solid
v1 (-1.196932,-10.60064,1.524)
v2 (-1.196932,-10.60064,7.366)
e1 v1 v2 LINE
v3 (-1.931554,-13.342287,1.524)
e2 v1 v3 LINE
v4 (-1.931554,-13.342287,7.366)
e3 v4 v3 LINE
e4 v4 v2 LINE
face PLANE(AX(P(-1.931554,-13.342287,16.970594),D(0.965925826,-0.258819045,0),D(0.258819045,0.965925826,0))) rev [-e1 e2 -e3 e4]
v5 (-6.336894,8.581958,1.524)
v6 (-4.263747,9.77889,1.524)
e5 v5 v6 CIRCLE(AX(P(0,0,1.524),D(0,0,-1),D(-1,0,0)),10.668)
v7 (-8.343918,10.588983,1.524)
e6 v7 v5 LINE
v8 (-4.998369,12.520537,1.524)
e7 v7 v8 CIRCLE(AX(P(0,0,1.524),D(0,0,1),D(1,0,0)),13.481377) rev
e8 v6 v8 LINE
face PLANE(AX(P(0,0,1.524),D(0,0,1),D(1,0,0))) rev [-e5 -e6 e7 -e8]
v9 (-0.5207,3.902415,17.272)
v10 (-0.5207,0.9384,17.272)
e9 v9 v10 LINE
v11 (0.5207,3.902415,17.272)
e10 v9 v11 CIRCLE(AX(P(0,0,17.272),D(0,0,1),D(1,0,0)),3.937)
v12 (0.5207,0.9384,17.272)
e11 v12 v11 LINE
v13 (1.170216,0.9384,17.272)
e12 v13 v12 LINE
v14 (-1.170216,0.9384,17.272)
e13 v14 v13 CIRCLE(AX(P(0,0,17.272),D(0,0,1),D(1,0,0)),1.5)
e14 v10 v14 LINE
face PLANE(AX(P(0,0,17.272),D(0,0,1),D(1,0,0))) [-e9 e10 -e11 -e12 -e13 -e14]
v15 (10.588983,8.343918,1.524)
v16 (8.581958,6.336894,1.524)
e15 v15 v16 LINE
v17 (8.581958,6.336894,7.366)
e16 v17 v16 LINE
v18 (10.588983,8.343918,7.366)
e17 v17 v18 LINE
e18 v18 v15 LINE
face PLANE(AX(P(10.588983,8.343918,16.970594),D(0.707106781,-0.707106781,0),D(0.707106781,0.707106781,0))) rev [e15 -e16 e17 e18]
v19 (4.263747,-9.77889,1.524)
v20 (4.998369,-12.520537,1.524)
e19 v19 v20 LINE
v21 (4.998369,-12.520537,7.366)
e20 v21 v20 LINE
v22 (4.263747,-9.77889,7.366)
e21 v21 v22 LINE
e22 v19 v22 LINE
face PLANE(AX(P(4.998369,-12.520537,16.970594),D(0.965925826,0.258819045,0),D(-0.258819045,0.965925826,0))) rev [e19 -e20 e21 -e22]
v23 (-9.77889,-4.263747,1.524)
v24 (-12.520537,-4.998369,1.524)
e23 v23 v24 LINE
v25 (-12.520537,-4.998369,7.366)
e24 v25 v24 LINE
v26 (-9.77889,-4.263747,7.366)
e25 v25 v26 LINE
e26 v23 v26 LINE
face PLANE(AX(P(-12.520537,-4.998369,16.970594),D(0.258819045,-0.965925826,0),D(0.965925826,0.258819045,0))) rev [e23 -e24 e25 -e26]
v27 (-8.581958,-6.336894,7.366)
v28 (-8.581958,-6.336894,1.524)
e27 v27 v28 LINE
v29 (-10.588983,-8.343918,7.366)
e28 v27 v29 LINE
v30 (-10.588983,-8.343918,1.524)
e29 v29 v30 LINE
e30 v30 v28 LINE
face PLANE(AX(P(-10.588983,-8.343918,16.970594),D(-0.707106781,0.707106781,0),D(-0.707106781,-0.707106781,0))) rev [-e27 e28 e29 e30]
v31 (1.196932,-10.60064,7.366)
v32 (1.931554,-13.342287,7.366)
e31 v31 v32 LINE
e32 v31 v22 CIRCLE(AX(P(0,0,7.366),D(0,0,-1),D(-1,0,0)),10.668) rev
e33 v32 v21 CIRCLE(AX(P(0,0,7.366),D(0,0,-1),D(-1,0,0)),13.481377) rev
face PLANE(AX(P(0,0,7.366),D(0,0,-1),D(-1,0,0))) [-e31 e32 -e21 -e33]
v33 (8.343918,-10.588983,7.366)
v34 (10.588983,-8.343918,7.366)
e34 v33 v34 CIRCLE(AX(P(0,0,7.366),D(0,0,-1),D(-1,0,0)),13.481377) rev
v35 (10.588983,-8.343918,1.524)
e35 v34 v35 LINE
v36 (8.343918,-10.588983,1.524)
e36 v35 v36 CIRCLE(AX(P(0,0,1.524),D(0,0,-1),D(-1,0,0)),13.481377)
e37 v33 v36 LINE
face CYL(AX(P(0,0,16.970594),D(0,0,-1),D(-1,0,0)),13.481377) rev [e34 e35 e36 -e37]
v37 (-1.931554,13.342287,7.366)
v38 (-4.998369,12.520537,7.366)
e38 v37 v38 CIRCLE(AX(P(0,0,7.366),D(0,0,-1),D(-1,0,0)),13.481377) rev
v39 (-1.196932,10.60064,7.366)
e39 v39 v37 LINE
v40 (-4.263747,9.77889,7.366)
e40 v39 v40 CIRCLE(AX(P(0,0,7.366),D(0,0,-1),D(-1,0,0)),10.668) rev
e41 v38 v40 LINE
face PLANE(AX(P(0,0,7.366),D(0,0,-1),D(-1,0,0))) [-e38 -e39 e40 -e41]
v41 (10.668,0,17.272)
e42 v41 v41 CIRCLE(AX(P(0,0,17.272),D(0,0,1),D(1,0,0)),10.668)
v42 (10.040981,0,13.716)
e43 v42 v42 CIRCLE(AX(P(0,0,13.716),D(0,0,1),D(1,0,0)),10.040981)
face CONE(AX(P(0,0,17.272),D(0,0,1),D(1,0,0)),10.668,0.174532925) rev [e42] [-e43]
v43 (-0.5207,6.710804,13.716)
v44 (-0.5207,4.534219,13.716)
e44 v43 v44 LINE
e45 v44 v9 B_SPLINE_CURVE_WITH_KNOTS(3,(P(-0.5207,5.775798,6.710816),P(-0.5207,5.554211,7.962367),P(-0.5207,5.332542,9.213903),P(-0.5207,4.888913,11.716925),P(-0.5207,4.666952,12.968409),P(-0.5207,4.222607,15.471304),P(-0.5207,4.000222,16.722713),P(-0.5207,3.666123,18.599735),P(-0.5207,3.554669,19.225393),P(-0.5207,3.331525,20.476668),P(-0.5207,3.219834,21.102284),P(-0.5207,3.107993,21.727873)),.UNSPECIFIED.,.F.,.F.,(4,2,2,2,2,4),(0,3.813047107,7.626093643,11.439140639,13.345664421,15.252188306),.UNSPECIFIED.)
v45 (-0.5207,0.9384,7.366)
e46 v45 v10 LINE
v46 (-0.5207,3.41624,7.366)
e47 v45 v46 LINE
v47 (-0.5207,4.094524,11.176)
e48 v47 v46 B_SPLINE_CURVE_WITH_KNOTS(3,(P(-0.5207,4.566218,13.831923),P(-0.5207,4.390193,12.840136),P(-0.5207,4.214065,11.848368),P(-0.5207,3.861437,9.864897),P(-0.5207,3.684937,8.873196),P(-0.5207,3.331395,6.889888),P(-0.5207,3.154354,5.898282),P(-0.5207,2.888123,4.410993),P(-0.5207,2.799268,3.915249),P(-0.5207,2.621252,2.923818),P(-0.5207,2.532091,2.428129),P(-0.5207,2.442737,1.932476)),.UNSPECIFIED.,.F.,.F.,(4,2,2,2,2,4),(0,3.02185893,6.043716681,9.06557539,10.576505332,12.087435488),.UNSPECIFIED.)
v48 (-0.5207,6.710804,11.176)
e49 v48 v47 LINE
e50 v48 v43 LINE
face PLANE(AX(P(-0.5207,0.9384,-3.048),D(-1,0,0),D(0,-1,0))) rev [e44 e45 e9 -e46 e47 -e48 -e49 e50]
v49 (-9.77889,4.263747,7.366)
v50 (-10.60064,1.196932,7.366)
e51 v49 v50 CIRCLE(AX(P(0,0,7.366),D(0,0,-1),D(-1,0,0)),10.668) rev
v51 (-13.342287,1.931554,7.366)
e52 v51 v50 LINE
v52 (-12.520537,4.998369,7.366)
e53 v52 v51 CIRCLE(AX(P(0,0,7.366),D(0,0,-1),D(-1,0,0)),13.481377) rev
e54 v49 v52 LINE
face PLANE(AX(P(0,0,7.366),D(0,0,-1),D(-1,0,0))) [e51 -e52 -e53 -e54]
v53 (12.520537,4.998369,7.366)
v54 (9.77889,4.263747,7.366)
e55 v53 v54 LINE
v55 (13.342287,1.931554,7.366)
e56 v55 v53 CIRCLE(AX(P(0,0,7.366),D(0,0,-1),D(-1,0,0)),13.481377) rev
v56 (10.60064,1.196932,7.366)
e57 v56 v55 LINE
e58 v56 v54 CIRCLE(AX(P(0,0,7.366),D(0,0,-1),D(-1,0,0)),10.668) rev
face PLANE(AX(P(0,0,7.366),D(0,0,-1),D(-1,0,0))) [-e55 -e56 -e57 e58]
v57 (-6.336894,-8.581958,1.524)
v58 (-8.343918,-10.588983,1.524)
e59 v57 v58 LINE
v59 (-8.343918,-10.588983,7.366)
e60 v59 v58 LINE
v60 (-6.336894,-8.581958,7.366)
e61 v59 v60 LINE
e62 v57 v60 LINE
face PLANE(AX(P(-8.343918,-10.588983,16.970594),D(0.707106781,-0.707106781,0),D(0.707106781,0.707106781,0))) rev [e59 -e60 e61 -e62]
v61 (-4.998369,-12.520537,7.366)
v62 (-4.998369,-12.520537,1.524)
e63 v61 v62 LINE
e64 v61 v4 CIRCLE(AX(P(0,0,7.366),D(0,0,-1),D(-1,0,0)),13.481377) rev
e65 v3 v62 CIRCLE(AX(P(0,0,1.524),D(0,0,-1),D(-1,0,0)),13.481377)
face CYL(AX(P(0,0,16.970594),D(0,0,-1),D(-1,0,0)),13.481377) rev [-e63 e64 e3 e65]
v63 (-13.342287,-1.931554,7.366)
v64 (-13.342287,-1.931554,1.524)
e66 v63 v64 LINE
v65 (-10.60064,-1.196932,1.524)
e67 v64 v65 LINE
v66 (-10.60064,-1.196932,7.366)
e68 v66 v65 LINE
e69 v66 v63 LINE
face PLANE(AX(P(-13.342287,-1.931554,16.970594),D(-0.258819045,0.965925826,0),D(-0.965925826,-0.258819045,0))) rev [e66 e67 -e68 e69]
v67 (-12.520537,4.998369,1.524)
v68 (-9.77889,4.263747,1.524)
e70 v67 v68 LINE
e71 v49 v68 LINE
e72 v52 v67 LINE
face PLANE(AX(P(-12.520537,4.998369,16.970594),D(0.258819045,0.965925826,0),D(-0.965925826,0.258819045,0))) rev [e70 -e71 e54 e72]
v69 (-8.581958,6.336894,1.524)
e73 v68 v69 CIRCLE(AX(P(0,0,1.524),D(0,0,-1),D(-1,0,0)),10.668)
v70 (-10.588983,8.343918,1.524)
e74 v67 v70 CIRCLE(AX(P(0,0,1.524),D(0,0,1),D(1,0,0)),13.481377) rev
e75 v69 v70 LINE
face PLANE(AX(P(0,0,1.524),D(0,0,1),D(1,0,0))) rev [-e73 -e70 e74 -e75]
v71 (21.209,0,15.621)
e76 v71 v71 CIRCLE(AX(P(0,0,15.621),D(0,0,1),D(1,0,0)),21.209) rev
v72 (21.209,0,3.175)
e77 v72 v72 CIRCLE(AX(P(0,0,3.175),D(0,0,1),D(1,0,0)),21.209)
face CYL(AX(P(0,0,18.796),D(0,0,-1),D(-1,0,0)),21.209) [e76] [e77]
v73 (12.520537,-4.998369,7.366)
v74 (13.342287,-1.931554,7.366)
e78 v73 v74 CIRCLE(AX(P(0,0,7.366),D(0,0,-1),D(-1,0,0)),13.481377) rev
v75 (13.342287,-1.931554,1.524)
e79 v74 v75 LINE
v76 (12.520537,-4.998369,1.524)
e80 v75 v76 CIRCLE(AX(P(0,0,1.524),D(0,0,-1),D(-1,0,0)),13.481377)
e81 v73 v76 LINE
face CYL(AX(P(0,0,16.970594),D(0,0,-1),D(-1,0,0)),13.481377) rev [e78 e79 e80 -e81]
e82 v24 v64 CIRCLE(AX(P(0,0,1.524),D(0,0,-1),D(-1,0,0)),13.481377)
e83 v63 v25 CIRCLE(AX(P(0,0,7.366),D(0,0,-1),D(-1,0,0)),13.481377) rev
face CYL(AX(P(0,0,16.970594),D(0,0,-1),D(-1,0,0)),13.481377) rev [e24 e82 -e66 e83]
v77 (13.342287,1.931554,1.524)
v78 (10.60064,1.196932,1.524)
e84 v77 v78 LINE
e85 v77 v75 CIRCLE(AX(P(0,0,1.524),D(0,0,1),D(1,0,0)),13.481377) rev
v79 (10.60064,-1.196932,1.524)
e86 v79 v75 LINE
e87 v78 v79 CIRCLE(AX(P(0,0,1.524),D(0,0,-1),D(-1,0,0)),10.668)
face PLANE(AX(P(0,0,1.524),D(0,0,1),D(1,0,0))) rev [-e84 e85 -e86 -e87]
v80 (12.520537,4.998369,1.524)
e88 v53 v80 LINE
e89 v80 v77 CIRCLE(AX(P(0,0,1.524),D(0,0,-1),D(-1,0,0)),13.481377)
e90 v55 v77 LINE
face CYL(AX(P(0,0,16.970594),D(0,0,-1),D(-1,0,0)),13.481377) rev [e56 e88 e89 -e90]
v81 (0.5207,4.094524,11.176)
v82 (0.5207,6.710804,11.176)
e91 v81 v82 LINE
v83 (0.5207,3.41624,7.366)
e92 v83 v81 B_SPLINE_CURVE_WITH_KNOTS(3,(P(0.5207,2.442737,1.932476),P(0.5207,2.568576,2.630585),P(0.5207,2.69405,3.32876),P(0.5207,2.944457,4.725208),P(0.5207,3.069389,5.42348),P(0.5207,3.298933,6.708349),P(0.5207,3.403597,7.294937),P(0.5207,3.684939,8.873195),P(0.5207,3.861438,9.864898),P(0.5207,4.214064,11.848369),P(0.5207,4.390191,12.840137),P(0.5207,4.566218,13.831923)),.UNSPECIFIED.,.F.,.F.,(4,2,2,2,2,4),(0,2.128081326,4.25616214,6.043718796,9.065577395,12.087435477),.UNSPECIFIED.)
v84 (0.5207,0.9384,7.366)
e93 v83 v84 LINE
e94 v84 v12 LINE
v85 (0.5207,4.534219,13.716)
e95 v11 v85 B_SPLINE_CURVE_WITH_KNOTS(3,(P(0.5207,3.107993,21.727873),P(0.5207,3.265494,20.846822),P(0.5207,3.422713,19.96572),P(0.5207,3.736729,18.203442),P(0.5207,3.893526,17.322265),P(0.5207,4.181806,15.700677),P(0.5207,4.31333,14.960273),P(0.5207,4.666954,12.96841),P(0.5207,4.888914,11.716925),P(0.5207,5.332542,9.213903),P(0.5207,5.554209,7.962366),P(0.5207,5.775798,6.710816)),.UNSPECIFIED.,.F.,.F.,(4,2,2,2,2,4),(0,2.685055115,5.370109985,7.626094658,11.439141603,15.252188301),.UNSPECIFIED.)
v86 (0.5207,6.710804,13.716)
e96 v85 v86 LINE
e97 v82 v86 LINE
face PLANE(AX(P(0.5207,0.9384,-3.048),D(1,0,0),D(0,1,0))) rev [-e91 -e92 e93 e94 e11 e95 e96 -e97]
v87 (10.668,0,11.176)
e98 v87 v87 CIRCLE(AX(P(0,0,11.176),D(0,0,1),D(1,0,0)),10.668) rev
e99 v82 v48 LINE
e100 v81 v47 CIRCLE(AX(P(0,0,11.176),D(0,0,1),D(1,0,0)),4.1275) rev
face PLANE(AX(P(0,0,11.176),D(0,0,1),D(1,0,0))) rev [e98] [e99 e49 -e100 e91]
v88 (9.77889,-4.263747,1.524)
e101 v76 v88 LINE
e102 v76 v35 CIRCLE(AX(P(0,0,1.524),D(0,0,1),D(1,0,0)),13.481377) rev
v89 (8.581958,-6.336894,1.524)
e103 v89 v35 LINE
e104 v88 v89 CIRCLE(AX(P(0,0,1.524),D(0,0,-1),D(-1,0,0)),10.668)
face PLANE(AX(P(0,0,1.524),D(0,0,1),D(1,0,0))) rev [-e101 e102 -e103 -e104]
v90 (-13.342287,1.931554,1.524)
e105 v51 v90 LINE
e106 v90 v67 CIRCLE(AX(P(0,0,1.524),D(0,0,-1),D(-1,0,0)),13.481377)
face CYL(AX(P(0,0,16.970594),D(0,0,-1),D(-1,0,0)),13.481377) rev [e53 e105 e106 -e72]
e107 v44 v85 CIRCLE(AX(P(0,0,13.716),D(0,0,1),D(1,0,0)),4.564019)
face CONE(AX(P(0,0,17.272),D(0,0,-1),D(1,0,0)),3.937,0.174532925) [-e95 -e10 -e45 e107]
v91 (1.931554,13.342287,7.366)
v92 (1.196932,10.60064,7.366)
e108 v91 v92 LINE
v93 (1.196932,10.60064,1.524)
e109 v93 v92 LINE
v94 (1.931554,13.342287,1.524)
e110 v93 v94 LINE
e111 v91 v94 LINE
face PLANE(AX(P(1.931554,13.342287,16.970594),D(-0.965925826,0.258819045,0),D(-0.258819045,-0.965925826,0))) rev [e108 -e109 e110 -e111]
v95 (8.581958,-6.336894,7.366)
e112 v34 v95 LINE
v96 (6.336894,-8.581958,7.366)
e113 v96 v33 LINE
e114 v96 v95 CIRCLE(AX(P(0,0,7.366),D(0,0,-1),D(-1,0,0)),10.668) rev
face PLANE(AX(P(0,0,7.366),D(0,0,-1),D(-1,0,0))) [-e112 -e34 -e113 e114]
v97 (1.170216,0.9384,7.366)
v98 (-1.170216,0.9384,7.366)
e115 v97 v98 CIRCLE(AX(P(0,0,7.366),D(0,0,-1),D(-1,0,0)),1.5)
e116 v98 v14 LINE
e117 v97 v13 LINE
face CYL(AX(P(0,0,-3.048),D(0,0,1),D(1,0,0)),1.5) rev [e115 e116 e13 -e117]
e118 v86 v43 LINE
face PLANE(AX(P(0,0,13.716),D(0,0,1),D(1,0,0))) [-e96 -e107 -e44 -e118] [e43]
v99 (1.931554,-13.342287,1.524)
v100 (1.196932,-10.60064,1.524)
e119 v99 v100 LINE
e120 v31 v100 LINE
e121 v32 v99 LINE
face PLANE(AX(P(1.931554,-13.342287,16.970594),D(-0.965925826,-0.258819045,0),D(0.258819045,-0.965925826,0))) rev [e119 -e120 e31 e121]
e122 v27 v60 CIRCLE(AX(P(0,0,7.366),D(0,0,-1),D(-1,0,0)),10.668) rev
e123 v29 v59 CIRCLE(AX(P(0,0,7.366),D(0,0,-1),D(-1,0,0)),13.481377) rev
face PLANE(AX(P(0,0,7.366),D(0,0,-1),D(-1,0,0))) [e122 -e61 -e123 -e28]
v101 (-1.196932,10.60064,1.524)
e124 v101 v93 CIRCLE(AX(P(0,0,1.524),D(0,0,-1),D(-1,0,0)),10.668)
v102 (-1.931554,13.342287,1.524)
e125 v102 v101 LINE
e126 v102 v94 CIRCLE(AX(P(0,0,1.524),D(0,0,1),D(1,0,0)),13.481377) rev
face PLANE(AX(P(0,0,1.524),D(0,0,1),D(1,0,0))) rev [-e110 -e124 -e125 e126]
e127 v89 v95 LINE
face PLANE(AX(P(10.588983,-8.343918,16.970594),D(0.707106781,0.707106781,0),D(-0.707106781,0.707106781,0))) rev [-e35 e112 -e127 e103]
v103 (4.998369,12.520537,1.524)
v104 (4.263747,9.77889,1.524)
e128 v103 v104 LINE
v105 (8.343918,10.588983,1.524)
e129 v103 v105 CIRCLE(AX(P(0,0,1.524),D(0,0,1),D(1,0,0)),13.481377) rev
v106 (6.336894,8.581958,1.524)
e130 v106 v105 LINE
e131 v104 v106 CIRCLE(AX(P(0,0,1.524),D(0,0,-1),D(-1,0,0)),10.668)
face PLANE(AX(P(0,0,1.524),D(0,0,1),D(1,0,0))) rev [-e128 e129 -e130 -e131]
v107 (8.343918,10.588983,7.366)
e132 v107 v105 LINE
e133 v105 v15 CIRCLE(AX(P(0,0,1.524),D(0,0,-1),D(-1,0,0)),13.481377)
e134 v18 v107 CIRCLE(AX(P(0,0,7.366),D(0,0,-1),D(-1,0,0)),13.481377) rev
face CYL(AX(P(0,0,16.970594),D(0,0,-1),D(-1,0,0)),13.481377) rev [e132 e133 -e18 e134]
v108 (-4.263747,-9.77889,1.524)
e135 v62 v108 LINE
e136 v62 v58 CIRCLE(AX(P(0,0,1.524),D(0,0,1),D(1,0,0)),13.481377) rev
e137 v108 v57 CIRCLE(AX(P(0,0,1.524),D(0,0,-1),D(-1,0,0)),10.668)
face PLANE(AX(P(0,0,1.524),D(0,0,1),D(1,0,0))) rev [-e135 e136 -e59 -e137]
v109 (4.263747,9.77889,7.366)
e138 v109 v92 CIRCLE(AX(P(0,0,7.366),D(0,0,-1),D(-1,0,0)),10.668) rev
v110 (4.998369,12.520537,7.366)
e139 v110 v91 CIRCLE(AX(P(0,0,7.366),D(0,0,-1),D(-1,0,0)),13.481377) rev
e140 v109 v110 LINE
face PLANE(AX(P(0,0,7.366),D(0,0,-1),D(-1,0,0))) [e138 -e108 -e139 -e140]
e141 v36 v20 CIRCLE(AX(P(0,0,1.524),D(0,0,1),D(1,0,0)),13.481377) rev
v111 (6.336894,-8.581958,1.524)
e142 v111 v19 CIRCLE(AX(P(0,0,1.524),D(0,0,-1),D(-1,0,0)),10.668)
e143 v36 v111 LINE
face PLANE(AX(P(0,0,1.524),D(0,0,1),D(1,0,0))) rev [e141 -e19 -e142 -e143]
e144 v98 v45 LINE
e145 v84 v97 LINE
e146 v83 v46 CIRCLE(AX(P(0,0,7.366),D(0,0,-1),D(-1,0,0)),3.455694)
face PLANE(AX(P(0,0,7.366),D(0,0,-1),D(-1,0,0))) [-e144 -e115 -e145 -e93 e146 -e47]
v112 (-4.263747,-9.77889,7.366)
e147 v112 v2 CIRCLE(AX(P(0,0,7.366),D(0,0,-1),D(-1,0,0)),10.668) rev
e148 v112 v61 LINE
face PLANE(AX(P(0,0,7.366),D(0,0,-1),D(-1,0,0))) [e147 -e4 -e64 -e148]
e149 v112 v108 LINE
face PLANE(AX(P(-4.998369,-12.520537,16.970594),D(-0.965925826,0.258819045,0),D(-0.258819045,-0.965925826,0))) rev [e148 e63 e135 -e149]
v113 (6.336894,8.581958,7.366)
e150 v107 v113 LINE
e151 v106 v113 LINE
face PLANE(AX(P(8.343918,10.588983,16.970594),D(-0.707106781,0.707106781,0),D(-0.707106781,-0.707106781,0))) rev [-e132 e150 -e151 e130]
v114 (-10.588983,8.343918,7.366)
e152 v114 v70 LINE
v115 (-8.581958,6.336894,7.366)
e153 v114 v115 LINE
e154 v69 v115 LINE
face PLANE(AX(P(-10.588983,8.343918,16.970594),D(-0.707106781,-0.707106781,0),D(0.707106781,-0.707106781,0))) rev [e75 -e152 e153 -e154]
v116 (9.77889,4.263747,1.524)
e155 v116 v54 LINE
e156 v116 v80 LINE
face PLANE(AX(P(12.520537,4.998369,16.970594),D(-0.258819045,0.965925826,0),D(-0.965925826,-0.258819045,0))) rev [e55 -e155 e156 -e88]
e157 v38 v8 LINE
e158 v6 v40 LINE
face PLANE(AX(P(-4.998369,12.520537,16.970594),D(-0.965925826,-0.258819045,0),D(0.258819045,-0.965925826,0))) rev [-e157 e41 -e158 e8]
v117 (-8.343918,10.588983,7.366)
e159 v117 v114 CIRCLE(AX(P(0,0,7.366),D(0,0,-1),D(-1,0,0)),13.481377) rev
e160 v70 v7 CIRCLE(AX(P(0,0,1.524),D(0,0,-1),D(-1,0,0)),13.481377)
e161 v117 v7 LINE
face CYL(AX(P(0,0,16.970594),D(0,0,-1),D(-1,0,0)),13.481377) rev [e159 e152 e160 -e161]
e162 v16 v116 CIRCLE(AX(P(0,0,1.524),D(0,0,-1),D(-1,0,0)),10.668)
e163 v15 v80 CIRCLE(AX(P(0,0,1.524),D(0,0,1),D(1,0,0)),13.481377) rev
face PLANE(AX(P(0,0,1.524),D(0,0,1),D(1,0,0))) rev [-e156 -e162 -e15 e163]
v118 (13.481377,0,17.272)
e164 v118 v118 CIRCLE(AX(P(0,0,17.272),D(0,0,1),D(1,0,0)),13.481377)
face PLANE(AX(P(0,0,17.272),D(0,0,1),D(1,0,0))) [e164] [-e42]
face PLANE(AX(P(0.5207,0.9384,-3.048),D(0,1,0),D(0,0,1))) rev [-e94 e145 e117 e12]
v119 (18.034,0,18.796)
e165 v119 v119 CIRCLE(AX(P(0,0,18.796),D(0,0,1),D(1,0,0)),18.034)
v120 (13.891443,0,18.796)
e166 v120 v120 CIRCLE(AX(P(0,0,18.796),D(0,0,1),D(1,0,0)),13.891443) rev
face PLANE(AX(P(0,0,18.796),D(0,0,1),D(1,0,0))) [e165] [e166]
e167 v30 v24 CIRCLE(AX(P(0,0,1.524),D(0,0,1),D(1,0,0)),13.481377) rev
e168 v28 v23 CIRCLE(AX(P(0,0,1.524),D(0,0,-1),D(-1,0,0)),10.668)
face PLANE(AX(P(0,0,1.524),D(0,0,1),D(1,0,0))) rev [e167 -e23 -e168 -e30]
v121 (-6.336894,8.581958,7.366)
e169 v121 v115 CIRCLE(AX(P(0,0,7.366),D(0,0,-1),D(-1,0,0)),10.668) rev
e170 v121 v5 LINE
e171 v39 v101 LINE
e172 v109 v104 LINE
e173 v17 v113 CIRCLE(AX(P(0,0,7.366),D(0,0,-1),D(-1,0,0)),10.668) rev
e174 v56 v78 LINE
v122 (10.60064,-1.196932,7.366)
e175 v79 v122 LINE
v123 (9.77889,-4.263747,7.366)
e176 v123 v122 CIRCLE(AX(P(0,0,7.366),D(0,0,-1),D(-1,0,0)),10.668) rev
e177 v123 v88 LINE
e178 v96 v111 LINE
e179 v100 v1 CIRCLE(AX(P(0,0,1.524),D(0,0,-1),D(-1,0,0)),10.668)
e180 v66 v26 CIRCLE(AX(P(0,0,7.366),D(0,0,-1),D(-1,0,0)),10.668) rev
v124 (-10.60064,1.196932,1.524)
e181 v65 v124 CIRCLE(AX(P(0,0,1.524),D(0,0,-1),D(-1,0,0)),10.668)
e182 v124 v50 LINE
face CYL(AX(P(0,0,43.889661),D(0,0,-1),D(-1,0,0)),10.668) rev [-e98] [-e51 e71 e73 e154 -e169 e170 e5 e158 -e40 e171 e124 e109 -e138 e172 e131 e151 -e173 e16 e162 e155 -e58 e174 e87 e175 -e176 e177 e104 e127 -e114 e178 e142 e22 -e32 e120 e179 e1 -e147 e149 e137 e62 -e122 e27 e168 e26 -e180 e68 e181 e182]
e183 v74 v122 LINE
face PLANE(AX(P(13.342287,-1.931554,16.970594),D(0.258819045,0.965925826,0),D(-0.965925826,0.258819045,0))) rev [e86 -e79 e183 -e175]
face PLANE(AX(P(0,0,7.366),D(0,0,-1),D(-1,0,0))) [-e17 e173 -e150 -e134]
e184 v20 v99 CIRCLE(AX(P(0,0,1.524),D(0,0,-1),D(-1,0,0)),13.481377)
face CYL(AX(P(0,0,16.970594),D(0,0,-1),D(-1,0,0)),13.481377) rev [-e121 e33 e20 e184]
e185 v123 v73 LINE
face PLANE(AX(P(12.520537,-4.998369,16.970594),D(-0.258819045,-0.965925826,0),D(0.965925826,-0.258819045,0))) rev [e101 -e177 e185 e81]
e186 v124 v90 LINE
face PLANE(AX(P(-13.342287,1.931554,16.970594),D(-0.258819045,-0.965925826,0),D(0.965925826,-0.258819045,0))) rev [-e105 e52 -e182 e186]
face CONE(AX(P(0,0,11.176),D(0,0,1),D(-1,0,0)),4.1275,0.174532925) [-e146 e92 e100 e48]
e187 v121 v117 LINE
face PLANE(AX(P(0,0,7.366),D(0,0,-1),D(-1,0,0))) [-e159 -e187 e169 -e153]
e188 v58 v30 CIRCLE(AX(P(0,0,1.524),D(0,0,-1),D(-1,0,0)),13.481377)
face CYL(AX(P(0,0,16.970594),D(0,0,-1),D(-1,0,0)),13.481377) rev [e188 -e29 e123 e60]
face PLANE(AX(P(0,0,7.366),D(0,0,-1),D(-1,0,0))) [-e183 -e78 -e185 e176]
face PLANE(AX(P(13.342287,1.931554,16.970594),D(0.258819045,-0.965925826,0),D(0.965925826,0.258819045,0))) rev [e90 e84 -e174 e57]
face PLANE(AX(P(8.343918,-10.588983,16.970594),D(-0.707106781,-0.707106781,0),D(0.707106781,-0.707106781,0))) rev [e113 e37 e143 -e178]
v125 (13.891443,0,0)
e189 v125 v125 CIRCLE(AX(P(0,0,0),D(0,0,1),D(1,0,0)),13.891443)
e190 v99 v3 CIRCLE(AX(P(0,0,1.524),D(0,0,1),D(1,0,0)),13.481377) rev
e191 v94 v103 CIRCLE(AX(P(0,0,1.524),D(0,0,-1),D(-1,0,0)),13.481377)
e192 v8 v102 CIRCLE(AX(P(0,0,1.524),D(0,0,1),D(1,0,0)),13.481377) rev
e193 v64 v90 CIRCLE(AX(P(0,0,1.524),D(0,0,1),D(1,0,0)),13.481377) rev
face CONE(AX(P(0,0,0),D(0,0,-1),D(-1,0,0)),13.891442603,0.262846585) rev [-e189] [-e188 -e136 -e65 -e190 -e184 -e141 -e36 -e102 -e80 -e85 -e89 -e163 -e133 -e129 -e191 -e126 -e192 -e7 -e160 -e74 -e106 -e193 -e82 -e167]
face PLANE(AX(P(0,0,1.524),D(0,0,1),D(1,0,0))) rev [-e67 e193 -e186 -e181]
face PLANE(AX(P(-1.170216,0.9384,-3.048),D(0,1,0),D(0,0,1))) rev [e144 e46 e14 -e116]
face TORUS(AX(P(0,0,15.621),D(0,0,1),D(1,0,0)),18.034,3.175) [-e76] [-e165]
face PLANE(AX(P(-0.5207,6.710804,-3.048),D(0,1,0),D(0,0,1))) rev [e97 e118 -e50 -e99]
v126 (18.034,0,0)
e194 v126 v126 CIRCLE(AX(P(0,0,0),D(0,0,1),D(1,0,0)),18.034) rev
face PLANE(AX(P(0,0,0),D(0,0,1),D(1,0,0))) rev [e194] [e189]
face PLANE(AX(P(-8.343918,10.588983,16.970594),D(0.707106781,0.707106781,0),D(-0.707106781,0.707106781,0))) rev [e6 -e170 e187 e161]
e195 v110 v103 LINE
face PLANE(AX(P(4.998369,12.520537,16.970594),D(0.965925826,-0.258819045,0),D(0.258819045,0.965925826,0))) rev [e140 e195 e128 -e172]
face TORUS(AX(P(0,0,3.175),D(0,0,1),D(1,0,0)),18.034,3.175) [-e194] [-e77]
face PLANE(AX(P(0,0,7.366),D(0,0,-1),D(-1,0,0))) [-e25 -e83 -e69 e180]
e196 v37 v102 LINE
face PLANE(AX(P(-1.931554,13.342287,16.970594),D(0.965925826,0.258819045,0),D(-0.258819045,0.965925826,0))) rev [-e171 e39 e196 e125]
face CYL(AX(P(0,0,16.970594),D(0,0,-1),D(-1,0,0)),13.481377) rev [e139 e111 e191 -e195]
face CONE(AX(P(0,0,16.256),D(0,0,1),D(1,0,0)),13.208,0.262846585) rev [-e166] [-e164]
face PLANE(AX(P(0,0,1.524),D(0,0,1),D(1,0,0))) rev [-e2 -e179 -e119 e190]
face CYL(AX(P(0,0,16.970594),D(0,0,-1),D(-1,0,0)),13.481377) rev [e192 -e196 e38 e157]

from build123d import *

# Parameters (mm, degrees)
SKETCH1_R           = 21.209
SKETCH1_R_2         = 13.208
BOSS_EXTRUDE1_DEPTH = 18.796
FILLET1_R           = 3.175
BOSS_EXTRUDE2_START = -1.524
SKETCH2_R           = 13.208
BOSS_EXTRUDE2_DEPTH = 15.748
SKETCH4_R           = 10.668
SKETCH4_R_2         = 3.937
CUT_EXTRUDE2_DEPTH  = 3.556
CUT_EXTRUDE2_DRAFT  = -10
SKETCH5_R           = 10.668
CUT_EXTRUDE3_DEPTH  = 9.652
SKETCH6_R           = 4.1275
BOSS_EXTRUDE3_DEPTH = 3.81
BOSS_EXTRUDE3_TAPER = 10
CUT_EXTRUDE1_DEPTH  = 20.32
CHAMFER2_SIZE       = 0.683442603
CHAMFER2_SIZE_2     = 2.54
CHAMFER3_SIZE       = 0.683442603
CHAMFER3_SIZE_2     = 2.54
CUT_EXTRUDE4_DEPTH  = 5.842


with BuildPart() as part:
    # Sketch1 → Boss-Extrude1 (new body)
    with BuildSketch(Plane.XY):
        Circle(SKETCH1_R)
        Circle(SKETCH1_R_2, mode=Mode.SUBTRACT)
    extrude(amount=BOSS_EXTRUDE1_DEPTH)

    # Fillet1
    fillet1_edges = [part.edges().sort_by_distance(p)[0] for p in [
        (-21.209, 0, 0),
        (-21.209, 0, 18.796),
    ]]
    fillet(fillet1_edges, radius=FILLET1_R)



with BuildPart() as body_2:
    # Sketch2 → Boss-Extrude2 (new body)
    with BuildSketch(Plane.XY.offset(18.796).offset(BOSS_EXTRUDE2_START)):
        Circle(SKETCH2_R)
    extrude(amount=-BOSS_EXTRUDE2_DEPTH)


with BuildPart() as cut_extrude2_tool:
    # Sketch4 → Cut-Extrude2 (with draft: the straight prism first)
    with BuildSketch(Plane.XY.offset(17.272)):
        Circle(SKETCH4_R)
        Circle(SKETCH4_R_2, mode=Mode.SUBTRACT)
    extrude(amount=-CUT_EXTRUDE2_DEPTH)
    # Cut-Extrude2: the draft: its side faces are tilted about the plane it starts from
    cut_extrude2_sides = [cut_extrude2_tool.faces().sort_by_distance(p)[0] for p in [
        (-10.668, 0, 15.494),
        (-3.937, 0, 15.494),
    ]]
    draft(cut_extrude2_sides, Plane.XY.offset(17.272), CUT_EXTRUDE2_DRAFT)


with BuildPart() as body_2_1:
    add(body_2.part)

    # Cut-Extrude2: cut by cut_extrude2_tool
    add(cut_extrude2_tool.part, mode=Mode.SUBTRACT)

    # Sketch5 → Cut-Extrude3 (cut)
    with BuildSketch(Plane(origin=(0, 0, 1.524), x_dir=(-1, 0, 0), z_dir=(0, 0, -1))):
        Circle(SKETCH5_R)
    extrude(amount=-CUT_EXTRUDE3_DEPTH, mode=Mode.SUBTRACT)


with BuildPart() as part_1:
    add(part.part)

    add(body_2_1.part)  # Boss-Extrude3 merges body 2
    # Sketch6 → Boss-Extrude3 (add)
    with BuildSketch(Plane(origin=(0, 0, 11.176), x_dir=(-1, 0, 0), z_dir=(0, 0, -1))):
        Circle(SKETCH6_R)
    extrude(amount=BOSS_EXTRUDE3_DEPTH, taper=BOSS_EXTRUDE3_TAPER)

    # Sketch3 → Cut-Extrude1 (cut)
    with BuildSketch(Plane.XY.offset(17.272)):
        with BuildLine():
            Line((-1.17021598, 0.9384), (-0.5207, 0.9384))
            Line((-0.5207, 0.9384), (-0.5207, 6.710804028))
            Line((-0.5207, 6.710804028), (0.5207, 6.710804028))
            Line((0.5207, 6.710804028), (0.5207, 0.9384))
            Line((0.5207, 0.9384), (1.17021598, 0.9384))
            ThreePointArc((1.17021598, 0.9384), (0, -1.5), (-1.17021598, 0.9384))
        make_face()
    extrude(amount=-CUT_EXTRUDE1_DEPTH, mode=Mode.SUBTRACT)

    # Chamfer2
    # the kernel refuses this chamfer: 2.54, 0.683442603 mm, written as the material it takes off along each edge
    with BuildSketch(Plane(origin=(0, 0, 18.796), x_dir=(1, 0, 0), z_dir=(0, -1, 0))) as chamfer2_piece_1_section:
        Polygon((13.208 + CHAMFER2_SIZE, 0), (13.208, -CHAMFER2_SIZE_2), (13.208, 0), align=None)
    chamfer2_piece_1 = revolve(axis=Axis((0, 0, 18.796), (0, 0, 1)), mode=Mode.PRIVATE)
    chamfer2_piece_1 = split(chamfer2_piece_1, bisect_by=Plane(origin=(-13.659448533, 0, 17.272), z_dir=(0, 0, 1)), keep=Keep.TOP, mode=Mode.PRIVATE)
    add(chamfer2_piece_1, mode=Mode.SUBTRACT)

    # Chamfer3
    # the kernel refuses this chamfer: 2.54, 0.683442603 mm, written as the material it takes off along each edge
    with BuildSketch(Plane(origin=(0, 0, 0), x_dir=(1, 0, 0), z_dir=(0, -1, 0))) as chamfer3_piece_1_section:
        Polygon((13.208 + CHAMFER3_SIZE, 0), (13.208, CHAMFER3_SIZE_2), (13.208, 0), align=None)
    chamfer3_piece_1 = revolve(axis=Axis((0, 0, 0), (0, 0, 1)), mode=Mode.PRIVATE)
    chamfer3_piece_1 = split(chamfer3_piece_1, bisect_by=Plane(origin=(-13.659448521, 0, 1.524), z_dir=(0, 0, -1)), keep=Keep.TOP, mode=Mode.PRIVATE)
    add(chamfer3_piece_1, mode=Mode.SUBTRACT)

    # Sketch8 → Cut-Extrude4 (cut)
    with BuildSketch(Plane(origin=(0, 0, 1.524), x_dir=(-1, 0, 0), z_dir=(0, 0, -1))):
        with BuildLine():
            Line((1.931554123, 13.34228712), (0.26745284, 7.131776584))
            Line((0.26745284, 7.131776584), (3.334267338, 6.310026116))
            Line((3.334267338, 6.310026116), (4.998368621, 12.520536652))
            ThreePointArc((4.998368621, 12.520536652), (3.489237132, 13.022010258), (1.931554123, 13.34228712))
        make_face()
        with BuildLine():
            Line((8.343918499, 10.588982529), (3.797509246, 6.042573276))
            Line((3.797509246, 6.042573276), (6.042573276, 3.797509246))
            Line((6.042573276, 3.797509246), (10.588982529, 8.343918499))
            ThreePointArc((10.588982529, 8.343918499), (9.532773125, 9.532773125), (8.343918499, 10.588982529))
        make_face()
        with BuildLine():
            Line((12.520536652, 4.998368621), (6.310026116, 3.334267338))
            Line((6.310026116, 3.334267338), (7.131776584, 0.26745284))
            Line((7.131776584, 0.26745284), (13.34228712, 1.931554123))
            ThreePointArc((13.34228712, 1.931554123), (13.022010258, 3.489237132), (12.520536652, 4.998368621))
        make_face()
        with BuildLine():
            Line((13.34228712, -1.931554123), (7.131776584, -0.26745284))
            Line((7.131776584, -0.26745284), (6.310026116, -3.334267338))
            Line((6.310026116, -3.334267338), (12.520536652, -4.998368621))
            ThreePointArc((12.520536652, -4.998368621), (13.022010258, -3.489237132), (13.34228712, -1.931554123))
        make_face()
        with BuildLine():
            Line((10.588982529, -8.343918499), (6.042573276, -3.797509246))
            Line((6.042573276, -3.797509246), (3.797509246, -6.042573276))
            Line((3.797509246, -6.042573276), (8.343918499, -10.588982529))
            ThreePointArc((8.343918499, -10.588982529), (9.532773125, -9.532773125), (10.588982529, -8.343918499))
        make_face()
        with BuildLine():
            Line((4.998368621, -12.520536652), (3.334267338, -6.310026116))
            Line((3.334267338, -6.310026116), (0.26745284, -7.131776584))
            Line((0.26745284, -7.131776584), (1.931554123, -13.34228712))
            ThreePointArc((1.931554123, -13.34228712), (3.489237132, -13.022010258), (4.998368621, -12.520536652))
        make_face()
        with BuildLine():
            Line((-1.931554123, -13.34228712), (-0.26745284, -7.131776584))
            Line((-0.26745284, -7.131776584), (-3.334267338, -6.310026116))
            Line((-3.334267338, -6.310026116), (-4.998368621, -12.520536652))
            ThreePointArc((-4.998368621, -12.520536652), (-3.489237132, -13.022010258), (-1.931554123, -13.34228712))
        make_face()
        with BuildLine():
            Line((-8.343918499, -10.588982529), (-3.797509246, -6.042573276))
            Line((-3.797509246, -6.042573276), (-6.042573276, -3.797509246))
            Line((-6.042573276, -3.797509246), (-10.588982529, -8.343918499))
            ThreePointArc((-10.588982529, -8.343918499), (-9.532773125, -9.532773125), (-8.343918499, -10.588982529))
        make_face()
        with BuildLine():
            Line((-12.520536652, -4.998368621), (-6.310026116, -3.334267338))
            Line((-6.310026116, -3.334267338), (-7.131776584, -0.26745284))
            Line((-7.131776584, -0.26745284), (-13.34228712, -1.931554123))
            ThreePointArc((-13.34228712, -1.931554123), (-13.022010258, -3.489237132), (-12.520536652, -4.998368621))
        make_face()
        with BuildLine():
            Line((-13.34228712, 1.931554123), (-7.131776584, 0.26745284))
            Line((-7.131776584, 0.26745284), (-6.310026116, 3.334267338))
            Line((-6.310026116, 3.334267338), (-12.520536652, 4.998368621))
            ThreePointArc((-12.520536652, 4.998368621), (-13.022010258, 3.489237132), (-13.34228712, 1.931554123))
        make_face()
        with BuildLine():
            Line((-10.588982529, 8.343918499), (-6.042573276, 3.797509246))
            Line((-6.042573276, 3.797509246), (-3.797509246, 6.042573276))
            Line((-3.797509246, 6.042573276), (-8.343918499, 10.588982529))
            ThreePointArc((-8.343918499, 10.588982529), (-9.532773125, 9.532773125), (-10.588982529, 8.343918499))
        make_face()
        with BuildLine():
            Line((-4.998368621, 12.520536652), (-3.334267338, 6.310026116))
            Line((-3.334267338, 6.310026116), (-0.26745284, 7.131776584))
            Line((-0.26745284, 7.131776584), (-1.931554123, 13.34228712))
            ThreePointArc((-1.931554123, 13.34228712), (-3.489237132, 13.022010258), (-4.998368621, 12.520536652))
        make_face()
    extrude(amount=-CUT_EXTRUDE4_DEPTH, mode=Mode.SUBTRACT)


solid = part_1.part
